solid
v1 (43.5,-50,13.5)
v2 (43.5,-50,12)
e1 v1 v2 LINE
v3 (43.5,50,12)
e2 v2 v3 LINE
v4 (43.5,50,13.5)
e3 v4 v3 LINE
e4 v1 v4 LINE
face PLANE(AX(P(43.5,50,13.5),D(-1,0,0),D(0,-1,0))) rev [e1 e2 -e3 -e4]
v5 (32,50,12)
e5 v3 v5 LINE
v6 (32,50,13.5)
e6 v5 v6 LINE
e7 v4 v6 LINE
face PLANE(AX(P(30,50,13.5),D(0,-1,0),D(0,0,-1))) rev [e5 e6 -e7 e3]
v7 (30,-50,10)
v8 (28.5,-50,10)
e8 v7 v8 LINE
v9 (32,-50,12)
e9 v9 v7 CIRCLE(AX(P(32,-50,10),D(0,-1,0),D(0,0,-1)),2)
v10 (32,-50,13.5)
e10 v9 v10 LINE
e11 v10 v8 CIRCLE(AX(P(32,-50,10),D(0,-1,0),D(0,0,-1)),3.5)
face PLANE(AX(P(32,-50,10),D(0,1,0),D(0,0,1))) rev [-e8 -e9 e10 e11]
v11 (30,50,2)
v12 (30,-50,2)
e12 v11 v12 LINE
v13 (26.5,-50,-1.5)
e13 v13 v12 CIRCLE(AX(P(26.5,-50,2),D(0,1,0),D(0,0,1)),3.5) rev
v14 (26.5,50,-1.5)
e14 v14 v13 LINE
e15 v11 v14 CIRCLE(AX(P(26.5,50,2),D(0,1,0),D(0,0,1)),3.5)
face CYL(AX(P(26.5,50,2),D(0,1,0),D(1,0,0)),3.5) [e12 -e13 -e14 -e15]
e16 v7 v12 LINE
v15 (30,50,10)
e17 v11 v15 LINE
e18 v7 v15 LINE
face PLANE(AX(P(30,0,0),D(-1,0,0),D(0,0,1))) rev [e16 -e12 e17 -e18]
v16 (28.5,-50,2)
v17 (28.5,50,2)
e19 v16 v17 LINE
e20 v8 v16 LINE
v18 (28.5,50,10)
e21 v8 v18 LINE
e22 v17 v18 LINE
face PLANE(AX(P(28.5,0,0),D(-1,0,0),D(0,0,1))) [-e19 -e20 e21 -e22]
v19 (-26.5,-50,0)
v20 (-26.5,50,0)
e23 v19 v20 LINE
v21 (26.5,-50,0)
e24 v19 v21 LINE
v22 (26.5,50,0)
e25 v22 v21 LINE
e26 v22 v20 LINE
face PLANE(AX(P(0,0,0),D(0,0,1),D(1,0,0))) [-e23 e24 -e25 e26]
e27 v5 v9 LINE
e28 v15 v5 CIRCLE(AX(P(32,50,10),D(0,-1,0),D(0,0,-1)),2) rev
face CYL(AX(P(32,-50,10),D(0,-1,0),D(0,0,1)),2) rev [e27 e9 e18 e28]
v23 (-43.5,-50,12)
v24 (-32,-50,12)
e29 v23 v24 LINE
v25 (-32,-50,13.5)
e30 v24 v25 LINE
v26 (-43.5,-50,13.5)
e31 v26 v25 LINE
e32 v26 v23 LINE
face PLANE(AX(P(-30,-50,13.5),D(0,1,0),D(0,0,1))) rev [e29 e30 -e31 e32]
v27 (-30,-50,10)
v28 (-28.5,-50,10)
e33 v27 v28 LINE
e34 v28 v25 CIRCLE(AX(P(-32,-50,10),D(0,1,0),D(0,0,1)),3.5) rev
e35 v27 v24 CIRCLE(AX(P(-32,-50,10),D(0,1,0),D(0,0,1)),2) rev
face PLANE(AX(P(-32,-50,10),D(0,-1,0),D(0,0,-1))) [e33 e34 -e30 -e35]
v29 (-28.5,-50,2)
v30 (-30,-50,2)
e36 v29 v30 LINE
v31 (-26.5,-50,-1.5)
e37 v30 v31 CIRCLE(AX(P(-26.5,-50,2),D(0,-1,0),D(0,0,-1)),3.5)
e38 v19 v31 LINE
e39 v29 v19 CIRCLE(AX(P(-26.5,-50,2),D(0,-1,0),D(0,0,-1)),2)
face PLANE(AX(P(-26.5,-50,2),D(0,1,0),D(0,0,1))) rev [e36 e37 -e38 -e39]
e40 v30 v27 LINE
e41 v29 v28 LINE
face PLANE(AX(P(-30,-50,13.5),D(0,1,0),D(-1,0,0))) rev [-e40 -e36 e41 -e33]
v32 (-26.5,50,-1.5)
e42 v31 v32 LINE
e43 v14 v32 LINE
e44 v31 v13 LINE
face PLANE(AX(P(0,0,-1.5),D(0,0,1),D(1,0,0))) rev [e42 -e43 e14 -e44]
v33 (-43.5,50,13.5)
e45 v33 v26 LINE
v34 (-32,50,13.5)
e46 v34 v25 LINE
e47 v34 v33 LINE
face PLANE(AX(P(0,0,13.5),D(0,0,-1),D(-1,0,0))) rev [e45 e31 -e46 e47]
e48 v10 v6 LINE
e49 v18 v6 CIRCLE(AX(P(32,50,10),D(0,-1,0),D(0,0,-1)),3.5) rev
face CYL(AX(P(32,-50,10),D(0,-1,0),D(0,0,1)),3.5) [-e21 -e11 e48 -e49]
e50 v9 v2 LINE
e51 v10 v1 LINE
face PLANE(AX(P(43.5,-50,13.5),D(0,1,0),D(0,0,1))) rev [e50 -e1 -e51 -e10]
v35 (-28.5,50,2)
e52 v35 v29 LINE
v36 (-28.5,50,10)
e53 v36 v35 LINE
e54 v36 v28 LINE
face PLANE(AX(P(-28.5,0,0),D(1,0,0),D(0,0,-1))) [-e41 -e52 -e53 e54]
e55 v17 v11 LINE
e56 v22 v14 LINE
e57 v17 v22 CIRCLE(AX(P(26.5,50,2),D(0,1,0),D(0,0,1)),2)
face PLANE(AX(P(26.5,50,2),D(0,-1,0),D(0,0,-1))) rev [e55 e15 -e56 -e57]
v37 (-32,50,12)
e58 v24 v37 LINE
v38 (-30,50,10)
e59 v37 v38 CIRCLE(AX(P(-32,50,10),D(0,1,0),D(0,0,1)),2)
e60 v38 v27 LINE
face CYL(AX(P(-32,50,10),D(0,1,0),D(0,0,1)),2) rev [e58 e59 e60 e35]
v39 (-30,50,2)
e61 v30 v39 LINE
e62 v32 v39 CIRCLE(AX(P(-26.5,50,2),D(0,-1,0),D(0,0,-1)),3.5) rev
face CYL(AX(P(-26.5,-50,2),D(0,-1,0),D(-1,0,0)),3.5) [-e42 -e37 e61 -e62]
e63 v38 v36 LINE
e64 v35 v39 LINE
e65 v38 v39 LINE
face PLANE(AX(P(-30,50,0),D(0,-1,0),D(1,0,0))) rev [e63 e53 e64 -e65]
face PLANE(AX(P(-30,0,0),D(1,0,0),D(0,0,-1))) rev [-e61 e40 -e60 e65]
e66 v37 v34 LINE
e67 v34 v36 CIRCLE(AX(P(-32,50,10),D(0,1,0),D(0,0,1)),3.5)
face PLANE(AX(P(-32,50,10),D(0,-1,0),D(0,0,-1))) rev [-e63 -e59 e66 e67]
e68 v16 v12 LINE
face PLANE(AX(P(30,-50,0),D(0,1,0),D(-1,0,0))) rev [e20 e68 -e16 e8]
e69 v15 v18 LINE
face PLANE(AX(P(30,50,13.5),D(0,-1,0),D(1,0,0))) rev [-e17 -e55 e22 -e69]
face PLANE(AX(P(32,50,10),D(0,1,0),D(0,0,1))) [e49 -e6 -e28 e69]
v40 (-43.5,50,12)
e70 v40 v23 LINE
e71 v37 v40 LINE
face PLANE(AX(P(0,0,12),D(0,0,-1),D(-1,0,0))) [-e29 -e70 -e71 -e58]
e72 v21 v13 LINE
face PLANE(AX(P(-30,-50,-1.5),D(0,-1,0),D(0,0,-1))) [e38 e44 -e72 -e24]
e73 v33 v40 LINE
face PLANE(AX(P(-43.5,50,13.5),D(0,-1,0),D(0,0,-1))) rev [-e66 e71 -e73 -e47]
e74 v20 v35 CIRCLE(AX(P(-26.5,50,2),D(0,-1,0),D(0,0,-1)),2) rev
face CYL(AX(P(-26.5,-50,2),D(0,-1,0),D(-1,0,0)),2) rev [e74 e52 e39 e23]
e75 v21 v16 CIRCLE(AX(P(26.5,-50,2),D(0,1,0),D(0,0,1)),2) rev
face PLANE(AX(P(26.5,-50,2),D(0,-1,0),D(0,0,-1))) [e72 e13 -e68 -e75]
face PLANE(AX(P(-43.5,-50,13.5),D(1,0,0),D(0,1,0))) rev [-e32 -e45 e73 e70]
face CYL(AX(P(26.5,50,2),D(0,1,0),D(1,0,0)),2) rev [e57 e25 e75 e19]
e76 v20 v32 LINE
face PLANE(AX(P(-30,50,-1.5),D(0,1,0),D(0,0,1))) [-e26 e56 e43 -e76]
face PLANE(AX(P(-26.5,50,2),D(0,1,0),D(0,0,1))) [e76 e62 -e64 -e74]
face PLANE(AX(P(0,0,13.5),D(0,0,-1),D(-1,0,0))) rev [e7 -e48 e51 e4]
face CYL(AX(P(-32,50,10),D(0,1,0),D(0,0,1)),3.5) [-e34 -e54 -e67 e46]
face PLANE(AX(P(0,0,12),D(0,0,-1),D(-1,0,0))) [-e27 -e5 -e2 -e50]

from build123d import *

# Parameters (mm, degrees)
SKETCH_1_W                         = 60
SKETCH_1_H                         = 100
SM_BASE_FLANGE_1_DEPTH             = 1.5
SM_EDGE_FLANGE_1_STRIP_W           = 10
SM_EDGE_FLANGE_1_STRIP_H           = 1.5
SM_EDGE_FLANGE_1_STRIP_CUT_DEPTH   = 100
SM_EDGE_FLANGE_1_STRIP_2_W         = 10
SM_EDGE_FLANGE_1_STRIP_2_H         = 1.5
SM_EDGE_FLANGE_1_STRIP_CUT_2_DEPTH = 100
SM_EDGE_FLANGE_1_DEPTH             = 100
SM_EDGE_FLANGE_1_BEND_DEPTH        = 100
SM_EDGE_FLANGE_2_STRIP_W           = 10
SM_EDGE_FLANGE_2_STRIP_H           = 1.5
SM_EDGE_FLANGE_2_STRIP_CUT_DEPTH   = 100
SM_EDGE_FLANGE_2_STRIP_2_W         = 10
SM_EDGE_FLANGE_2_STRIP_2_H         = 1.5
SM_EDGE_FLANGE_2_STRIP_CUT_2_DEPTH = 100
SM_EDGE_FLANGE_2_DEPTH             = 100
SM_EDGE_FLANGE_2_BEND_DEPTH        = 100


# Sheet-metal steps are written as plain solids
with BuildPart() as part:
    # Sketch 1 → 基体-法兰1 (new body)
    with BuildSketch(Plane.XY):
        Rectangle(SKETCH_1_W, SKETCH_1_H)
    extrude(amount=-SM_BASE_FLANGE_1_DEPTH)

    # 边线-法兰1 strip (across the edge) → 边线-法兰1 strip cut (cut)
    with BuildSketch(Plane(origin=(-30, 50, 0), x_dir=(1, 0, 0), z_dir=(0, -1, 0))):
        with Locations((-1.5, -0.75)):
            Rectangle(SM_EDGE_FLANGE_1_STRIP_W, SM_EDGE_FLANGE_1_STRIP_H)
    extrude(amount=SM_EDGE_FLANGE_1_STRIP_CUT_DEPTH, mode=Mode.SUBTRACT)

    # 边线-法兰1 strip 2 (across the edge) → 边线-法兰1 strip cut 2 (cut)
    with BuildSketch(Plane(origin=(30, -50, 0), x_dir=(-1, 0, 0), z_dir=(0, 1, 0))):
        with Locations((-1.5, -0.75)):
            Rectangle(SM_EDGE_FLANGE_1_STRIP_2_W, SM_EDGE_FLANGE_1_STRIP_2_H)
    extrude(amount=SM_EDGE_FLANGE_1_STRIP_CUT_2_DEPTH, mode=Mode.SUBTRACT)

    # 边线-法兰1 section (across the edge) → 边线-法兰1 (add)
    with BuildSketch(Plane(origin=(-30, 50, 0), x_dir=(1, 0, 0), z_dir=(0, -1, 0))):
        with BuildLine():
            Line((0, 2), (0, 13.5))
            Line((0, 13.5), (1.5, 13.5))
            Line((1.5, 13.5), (1.5, 2))
            ThreePointArc((1.5, 2), (2.085786438, 0.585786438), (3.5, 0))
            Line((3.5, 0), (3.5, -1.5))
            ThreePointArc((3.5, -1.5), (1.025126266, -0.474873734), (0, 2))
        make_face()
    extrude(amount=SM_EDGE_FLANGE_1_DEPTH)

    # 边线-法兰1 section 2 (across the edge) → 边线-法兰1 bend (add)
    with BuildSketch(Plane(origin=(30, -50, 0), x_dir=(-1, 0, 0), z_dir=(0, 1, 0))):
        with BuildLine():
            Line((0, 2), (0, 13.5))
            Line((0, 13.5), (1.5, 13.5))
            Line((1.5, 13.5), (1.5, 2))
            ThreePointArc((1.5, 2), (2.085786438, 0.585786438), (3.5, 0))
            Line((3.5, 0), (3.5, -1.5))
            ThreePointArc((3.5, -1.5), (1.025126266, -0.474873734), (0, 2))
        make_face()
    extrude(amount=SM_EDGE_FLANGE_1_BEND_DEPTH)

    # 边线-法兰2 strip (across the edge) → 边线-法兰2 strip cut (cut)
    with BuildSketch(Plane(origin=(-30, -50, 13.5), x_dir=(0, 0, -1), z_dir=(0, 1, 0))):
        with Locations((-1.5, -0.75)):
            Rectangle(SM_EDGE_FLANGE_2_STRIP_W, SM_EDGE_FLANGE_2_STRIP_H)
    extrude(amount=SM_EDGE_FLANGE_2_STRIP_CUT_DEPTH, mode=Mode.SUBTRACT)

    # 边线-法兰2 strip 2 (across the edge) → 边线-法兰2 strip cut 2 (cut)
    with BuildSketch(Plane(origin=(30, 50, 13.5), x_dir=(0, 0, -1), z_dir=(0, -1, 0))):
        with Locations((-1.5, -0.75)):
            Rectangle(SM_EDGE_FLANGE_2_STRIP_2_W, SM_EDGE_FLANGE_2_STRIP_2_H)
    extrude(amount=SM_EDGE_FLANGE_2_STRIP_CUT_2_DEPTH, mode=Mode.SUBTRACT)

    # 边线-法兰2 section (across the edge) → 边线-法兰2 (add)
    with BuildSketch(Plane(origin=(-30, -50, 13.5), x_dir=(0, 0, -1), z_dir=(0, 1, 0))):
        with BuildLine():
            Line((0, 2), (0, 13.5))
            Line((0, 13.5), (1.5, 13.5))
            Line((1.5, 13.5), (1.5, 2))
            ThreePointArc((1.5, 2), (2.085786438, 0.585786438), (3.5, 0))
            Line((3.5, 0), (3.5, -1.5))
            ThreePointArc((3.5, -1.5), (1.025126266, -0.474873734), (0, 2))
        make_face()
    extrude(amount=SM_EDGE_FLANGE_2_DEPTH)

    # 边线-法兰2 section 2 (across the edge) → 边线-法兰2 bend (add)
    with BuildSketch(Plane(origin=(30, 50, 13.5), x_dir=(0, 0, -1), z_dir=(0, -1, 0))):
        with BuildLine():
            Line((0, 2), (0, 13.5))
            Line((0, 13.5), (1.5, 13.5))
            Line((1.5, 13.5), (1.5, 2))
            ThreePointArc((1.5, 2), (2.085786438, 0.585786438), (3.5, 0))
            Line((3.5, 0), (3.5, -1.5))
            ThreePointArc((3.5, -1.5), (1.025126266, -0.474873734), (0, 2))
        make_face()
    extrude(amount=SM_EDGE_FLANGE_2_BEND_DEPTH)


solid = part.part
